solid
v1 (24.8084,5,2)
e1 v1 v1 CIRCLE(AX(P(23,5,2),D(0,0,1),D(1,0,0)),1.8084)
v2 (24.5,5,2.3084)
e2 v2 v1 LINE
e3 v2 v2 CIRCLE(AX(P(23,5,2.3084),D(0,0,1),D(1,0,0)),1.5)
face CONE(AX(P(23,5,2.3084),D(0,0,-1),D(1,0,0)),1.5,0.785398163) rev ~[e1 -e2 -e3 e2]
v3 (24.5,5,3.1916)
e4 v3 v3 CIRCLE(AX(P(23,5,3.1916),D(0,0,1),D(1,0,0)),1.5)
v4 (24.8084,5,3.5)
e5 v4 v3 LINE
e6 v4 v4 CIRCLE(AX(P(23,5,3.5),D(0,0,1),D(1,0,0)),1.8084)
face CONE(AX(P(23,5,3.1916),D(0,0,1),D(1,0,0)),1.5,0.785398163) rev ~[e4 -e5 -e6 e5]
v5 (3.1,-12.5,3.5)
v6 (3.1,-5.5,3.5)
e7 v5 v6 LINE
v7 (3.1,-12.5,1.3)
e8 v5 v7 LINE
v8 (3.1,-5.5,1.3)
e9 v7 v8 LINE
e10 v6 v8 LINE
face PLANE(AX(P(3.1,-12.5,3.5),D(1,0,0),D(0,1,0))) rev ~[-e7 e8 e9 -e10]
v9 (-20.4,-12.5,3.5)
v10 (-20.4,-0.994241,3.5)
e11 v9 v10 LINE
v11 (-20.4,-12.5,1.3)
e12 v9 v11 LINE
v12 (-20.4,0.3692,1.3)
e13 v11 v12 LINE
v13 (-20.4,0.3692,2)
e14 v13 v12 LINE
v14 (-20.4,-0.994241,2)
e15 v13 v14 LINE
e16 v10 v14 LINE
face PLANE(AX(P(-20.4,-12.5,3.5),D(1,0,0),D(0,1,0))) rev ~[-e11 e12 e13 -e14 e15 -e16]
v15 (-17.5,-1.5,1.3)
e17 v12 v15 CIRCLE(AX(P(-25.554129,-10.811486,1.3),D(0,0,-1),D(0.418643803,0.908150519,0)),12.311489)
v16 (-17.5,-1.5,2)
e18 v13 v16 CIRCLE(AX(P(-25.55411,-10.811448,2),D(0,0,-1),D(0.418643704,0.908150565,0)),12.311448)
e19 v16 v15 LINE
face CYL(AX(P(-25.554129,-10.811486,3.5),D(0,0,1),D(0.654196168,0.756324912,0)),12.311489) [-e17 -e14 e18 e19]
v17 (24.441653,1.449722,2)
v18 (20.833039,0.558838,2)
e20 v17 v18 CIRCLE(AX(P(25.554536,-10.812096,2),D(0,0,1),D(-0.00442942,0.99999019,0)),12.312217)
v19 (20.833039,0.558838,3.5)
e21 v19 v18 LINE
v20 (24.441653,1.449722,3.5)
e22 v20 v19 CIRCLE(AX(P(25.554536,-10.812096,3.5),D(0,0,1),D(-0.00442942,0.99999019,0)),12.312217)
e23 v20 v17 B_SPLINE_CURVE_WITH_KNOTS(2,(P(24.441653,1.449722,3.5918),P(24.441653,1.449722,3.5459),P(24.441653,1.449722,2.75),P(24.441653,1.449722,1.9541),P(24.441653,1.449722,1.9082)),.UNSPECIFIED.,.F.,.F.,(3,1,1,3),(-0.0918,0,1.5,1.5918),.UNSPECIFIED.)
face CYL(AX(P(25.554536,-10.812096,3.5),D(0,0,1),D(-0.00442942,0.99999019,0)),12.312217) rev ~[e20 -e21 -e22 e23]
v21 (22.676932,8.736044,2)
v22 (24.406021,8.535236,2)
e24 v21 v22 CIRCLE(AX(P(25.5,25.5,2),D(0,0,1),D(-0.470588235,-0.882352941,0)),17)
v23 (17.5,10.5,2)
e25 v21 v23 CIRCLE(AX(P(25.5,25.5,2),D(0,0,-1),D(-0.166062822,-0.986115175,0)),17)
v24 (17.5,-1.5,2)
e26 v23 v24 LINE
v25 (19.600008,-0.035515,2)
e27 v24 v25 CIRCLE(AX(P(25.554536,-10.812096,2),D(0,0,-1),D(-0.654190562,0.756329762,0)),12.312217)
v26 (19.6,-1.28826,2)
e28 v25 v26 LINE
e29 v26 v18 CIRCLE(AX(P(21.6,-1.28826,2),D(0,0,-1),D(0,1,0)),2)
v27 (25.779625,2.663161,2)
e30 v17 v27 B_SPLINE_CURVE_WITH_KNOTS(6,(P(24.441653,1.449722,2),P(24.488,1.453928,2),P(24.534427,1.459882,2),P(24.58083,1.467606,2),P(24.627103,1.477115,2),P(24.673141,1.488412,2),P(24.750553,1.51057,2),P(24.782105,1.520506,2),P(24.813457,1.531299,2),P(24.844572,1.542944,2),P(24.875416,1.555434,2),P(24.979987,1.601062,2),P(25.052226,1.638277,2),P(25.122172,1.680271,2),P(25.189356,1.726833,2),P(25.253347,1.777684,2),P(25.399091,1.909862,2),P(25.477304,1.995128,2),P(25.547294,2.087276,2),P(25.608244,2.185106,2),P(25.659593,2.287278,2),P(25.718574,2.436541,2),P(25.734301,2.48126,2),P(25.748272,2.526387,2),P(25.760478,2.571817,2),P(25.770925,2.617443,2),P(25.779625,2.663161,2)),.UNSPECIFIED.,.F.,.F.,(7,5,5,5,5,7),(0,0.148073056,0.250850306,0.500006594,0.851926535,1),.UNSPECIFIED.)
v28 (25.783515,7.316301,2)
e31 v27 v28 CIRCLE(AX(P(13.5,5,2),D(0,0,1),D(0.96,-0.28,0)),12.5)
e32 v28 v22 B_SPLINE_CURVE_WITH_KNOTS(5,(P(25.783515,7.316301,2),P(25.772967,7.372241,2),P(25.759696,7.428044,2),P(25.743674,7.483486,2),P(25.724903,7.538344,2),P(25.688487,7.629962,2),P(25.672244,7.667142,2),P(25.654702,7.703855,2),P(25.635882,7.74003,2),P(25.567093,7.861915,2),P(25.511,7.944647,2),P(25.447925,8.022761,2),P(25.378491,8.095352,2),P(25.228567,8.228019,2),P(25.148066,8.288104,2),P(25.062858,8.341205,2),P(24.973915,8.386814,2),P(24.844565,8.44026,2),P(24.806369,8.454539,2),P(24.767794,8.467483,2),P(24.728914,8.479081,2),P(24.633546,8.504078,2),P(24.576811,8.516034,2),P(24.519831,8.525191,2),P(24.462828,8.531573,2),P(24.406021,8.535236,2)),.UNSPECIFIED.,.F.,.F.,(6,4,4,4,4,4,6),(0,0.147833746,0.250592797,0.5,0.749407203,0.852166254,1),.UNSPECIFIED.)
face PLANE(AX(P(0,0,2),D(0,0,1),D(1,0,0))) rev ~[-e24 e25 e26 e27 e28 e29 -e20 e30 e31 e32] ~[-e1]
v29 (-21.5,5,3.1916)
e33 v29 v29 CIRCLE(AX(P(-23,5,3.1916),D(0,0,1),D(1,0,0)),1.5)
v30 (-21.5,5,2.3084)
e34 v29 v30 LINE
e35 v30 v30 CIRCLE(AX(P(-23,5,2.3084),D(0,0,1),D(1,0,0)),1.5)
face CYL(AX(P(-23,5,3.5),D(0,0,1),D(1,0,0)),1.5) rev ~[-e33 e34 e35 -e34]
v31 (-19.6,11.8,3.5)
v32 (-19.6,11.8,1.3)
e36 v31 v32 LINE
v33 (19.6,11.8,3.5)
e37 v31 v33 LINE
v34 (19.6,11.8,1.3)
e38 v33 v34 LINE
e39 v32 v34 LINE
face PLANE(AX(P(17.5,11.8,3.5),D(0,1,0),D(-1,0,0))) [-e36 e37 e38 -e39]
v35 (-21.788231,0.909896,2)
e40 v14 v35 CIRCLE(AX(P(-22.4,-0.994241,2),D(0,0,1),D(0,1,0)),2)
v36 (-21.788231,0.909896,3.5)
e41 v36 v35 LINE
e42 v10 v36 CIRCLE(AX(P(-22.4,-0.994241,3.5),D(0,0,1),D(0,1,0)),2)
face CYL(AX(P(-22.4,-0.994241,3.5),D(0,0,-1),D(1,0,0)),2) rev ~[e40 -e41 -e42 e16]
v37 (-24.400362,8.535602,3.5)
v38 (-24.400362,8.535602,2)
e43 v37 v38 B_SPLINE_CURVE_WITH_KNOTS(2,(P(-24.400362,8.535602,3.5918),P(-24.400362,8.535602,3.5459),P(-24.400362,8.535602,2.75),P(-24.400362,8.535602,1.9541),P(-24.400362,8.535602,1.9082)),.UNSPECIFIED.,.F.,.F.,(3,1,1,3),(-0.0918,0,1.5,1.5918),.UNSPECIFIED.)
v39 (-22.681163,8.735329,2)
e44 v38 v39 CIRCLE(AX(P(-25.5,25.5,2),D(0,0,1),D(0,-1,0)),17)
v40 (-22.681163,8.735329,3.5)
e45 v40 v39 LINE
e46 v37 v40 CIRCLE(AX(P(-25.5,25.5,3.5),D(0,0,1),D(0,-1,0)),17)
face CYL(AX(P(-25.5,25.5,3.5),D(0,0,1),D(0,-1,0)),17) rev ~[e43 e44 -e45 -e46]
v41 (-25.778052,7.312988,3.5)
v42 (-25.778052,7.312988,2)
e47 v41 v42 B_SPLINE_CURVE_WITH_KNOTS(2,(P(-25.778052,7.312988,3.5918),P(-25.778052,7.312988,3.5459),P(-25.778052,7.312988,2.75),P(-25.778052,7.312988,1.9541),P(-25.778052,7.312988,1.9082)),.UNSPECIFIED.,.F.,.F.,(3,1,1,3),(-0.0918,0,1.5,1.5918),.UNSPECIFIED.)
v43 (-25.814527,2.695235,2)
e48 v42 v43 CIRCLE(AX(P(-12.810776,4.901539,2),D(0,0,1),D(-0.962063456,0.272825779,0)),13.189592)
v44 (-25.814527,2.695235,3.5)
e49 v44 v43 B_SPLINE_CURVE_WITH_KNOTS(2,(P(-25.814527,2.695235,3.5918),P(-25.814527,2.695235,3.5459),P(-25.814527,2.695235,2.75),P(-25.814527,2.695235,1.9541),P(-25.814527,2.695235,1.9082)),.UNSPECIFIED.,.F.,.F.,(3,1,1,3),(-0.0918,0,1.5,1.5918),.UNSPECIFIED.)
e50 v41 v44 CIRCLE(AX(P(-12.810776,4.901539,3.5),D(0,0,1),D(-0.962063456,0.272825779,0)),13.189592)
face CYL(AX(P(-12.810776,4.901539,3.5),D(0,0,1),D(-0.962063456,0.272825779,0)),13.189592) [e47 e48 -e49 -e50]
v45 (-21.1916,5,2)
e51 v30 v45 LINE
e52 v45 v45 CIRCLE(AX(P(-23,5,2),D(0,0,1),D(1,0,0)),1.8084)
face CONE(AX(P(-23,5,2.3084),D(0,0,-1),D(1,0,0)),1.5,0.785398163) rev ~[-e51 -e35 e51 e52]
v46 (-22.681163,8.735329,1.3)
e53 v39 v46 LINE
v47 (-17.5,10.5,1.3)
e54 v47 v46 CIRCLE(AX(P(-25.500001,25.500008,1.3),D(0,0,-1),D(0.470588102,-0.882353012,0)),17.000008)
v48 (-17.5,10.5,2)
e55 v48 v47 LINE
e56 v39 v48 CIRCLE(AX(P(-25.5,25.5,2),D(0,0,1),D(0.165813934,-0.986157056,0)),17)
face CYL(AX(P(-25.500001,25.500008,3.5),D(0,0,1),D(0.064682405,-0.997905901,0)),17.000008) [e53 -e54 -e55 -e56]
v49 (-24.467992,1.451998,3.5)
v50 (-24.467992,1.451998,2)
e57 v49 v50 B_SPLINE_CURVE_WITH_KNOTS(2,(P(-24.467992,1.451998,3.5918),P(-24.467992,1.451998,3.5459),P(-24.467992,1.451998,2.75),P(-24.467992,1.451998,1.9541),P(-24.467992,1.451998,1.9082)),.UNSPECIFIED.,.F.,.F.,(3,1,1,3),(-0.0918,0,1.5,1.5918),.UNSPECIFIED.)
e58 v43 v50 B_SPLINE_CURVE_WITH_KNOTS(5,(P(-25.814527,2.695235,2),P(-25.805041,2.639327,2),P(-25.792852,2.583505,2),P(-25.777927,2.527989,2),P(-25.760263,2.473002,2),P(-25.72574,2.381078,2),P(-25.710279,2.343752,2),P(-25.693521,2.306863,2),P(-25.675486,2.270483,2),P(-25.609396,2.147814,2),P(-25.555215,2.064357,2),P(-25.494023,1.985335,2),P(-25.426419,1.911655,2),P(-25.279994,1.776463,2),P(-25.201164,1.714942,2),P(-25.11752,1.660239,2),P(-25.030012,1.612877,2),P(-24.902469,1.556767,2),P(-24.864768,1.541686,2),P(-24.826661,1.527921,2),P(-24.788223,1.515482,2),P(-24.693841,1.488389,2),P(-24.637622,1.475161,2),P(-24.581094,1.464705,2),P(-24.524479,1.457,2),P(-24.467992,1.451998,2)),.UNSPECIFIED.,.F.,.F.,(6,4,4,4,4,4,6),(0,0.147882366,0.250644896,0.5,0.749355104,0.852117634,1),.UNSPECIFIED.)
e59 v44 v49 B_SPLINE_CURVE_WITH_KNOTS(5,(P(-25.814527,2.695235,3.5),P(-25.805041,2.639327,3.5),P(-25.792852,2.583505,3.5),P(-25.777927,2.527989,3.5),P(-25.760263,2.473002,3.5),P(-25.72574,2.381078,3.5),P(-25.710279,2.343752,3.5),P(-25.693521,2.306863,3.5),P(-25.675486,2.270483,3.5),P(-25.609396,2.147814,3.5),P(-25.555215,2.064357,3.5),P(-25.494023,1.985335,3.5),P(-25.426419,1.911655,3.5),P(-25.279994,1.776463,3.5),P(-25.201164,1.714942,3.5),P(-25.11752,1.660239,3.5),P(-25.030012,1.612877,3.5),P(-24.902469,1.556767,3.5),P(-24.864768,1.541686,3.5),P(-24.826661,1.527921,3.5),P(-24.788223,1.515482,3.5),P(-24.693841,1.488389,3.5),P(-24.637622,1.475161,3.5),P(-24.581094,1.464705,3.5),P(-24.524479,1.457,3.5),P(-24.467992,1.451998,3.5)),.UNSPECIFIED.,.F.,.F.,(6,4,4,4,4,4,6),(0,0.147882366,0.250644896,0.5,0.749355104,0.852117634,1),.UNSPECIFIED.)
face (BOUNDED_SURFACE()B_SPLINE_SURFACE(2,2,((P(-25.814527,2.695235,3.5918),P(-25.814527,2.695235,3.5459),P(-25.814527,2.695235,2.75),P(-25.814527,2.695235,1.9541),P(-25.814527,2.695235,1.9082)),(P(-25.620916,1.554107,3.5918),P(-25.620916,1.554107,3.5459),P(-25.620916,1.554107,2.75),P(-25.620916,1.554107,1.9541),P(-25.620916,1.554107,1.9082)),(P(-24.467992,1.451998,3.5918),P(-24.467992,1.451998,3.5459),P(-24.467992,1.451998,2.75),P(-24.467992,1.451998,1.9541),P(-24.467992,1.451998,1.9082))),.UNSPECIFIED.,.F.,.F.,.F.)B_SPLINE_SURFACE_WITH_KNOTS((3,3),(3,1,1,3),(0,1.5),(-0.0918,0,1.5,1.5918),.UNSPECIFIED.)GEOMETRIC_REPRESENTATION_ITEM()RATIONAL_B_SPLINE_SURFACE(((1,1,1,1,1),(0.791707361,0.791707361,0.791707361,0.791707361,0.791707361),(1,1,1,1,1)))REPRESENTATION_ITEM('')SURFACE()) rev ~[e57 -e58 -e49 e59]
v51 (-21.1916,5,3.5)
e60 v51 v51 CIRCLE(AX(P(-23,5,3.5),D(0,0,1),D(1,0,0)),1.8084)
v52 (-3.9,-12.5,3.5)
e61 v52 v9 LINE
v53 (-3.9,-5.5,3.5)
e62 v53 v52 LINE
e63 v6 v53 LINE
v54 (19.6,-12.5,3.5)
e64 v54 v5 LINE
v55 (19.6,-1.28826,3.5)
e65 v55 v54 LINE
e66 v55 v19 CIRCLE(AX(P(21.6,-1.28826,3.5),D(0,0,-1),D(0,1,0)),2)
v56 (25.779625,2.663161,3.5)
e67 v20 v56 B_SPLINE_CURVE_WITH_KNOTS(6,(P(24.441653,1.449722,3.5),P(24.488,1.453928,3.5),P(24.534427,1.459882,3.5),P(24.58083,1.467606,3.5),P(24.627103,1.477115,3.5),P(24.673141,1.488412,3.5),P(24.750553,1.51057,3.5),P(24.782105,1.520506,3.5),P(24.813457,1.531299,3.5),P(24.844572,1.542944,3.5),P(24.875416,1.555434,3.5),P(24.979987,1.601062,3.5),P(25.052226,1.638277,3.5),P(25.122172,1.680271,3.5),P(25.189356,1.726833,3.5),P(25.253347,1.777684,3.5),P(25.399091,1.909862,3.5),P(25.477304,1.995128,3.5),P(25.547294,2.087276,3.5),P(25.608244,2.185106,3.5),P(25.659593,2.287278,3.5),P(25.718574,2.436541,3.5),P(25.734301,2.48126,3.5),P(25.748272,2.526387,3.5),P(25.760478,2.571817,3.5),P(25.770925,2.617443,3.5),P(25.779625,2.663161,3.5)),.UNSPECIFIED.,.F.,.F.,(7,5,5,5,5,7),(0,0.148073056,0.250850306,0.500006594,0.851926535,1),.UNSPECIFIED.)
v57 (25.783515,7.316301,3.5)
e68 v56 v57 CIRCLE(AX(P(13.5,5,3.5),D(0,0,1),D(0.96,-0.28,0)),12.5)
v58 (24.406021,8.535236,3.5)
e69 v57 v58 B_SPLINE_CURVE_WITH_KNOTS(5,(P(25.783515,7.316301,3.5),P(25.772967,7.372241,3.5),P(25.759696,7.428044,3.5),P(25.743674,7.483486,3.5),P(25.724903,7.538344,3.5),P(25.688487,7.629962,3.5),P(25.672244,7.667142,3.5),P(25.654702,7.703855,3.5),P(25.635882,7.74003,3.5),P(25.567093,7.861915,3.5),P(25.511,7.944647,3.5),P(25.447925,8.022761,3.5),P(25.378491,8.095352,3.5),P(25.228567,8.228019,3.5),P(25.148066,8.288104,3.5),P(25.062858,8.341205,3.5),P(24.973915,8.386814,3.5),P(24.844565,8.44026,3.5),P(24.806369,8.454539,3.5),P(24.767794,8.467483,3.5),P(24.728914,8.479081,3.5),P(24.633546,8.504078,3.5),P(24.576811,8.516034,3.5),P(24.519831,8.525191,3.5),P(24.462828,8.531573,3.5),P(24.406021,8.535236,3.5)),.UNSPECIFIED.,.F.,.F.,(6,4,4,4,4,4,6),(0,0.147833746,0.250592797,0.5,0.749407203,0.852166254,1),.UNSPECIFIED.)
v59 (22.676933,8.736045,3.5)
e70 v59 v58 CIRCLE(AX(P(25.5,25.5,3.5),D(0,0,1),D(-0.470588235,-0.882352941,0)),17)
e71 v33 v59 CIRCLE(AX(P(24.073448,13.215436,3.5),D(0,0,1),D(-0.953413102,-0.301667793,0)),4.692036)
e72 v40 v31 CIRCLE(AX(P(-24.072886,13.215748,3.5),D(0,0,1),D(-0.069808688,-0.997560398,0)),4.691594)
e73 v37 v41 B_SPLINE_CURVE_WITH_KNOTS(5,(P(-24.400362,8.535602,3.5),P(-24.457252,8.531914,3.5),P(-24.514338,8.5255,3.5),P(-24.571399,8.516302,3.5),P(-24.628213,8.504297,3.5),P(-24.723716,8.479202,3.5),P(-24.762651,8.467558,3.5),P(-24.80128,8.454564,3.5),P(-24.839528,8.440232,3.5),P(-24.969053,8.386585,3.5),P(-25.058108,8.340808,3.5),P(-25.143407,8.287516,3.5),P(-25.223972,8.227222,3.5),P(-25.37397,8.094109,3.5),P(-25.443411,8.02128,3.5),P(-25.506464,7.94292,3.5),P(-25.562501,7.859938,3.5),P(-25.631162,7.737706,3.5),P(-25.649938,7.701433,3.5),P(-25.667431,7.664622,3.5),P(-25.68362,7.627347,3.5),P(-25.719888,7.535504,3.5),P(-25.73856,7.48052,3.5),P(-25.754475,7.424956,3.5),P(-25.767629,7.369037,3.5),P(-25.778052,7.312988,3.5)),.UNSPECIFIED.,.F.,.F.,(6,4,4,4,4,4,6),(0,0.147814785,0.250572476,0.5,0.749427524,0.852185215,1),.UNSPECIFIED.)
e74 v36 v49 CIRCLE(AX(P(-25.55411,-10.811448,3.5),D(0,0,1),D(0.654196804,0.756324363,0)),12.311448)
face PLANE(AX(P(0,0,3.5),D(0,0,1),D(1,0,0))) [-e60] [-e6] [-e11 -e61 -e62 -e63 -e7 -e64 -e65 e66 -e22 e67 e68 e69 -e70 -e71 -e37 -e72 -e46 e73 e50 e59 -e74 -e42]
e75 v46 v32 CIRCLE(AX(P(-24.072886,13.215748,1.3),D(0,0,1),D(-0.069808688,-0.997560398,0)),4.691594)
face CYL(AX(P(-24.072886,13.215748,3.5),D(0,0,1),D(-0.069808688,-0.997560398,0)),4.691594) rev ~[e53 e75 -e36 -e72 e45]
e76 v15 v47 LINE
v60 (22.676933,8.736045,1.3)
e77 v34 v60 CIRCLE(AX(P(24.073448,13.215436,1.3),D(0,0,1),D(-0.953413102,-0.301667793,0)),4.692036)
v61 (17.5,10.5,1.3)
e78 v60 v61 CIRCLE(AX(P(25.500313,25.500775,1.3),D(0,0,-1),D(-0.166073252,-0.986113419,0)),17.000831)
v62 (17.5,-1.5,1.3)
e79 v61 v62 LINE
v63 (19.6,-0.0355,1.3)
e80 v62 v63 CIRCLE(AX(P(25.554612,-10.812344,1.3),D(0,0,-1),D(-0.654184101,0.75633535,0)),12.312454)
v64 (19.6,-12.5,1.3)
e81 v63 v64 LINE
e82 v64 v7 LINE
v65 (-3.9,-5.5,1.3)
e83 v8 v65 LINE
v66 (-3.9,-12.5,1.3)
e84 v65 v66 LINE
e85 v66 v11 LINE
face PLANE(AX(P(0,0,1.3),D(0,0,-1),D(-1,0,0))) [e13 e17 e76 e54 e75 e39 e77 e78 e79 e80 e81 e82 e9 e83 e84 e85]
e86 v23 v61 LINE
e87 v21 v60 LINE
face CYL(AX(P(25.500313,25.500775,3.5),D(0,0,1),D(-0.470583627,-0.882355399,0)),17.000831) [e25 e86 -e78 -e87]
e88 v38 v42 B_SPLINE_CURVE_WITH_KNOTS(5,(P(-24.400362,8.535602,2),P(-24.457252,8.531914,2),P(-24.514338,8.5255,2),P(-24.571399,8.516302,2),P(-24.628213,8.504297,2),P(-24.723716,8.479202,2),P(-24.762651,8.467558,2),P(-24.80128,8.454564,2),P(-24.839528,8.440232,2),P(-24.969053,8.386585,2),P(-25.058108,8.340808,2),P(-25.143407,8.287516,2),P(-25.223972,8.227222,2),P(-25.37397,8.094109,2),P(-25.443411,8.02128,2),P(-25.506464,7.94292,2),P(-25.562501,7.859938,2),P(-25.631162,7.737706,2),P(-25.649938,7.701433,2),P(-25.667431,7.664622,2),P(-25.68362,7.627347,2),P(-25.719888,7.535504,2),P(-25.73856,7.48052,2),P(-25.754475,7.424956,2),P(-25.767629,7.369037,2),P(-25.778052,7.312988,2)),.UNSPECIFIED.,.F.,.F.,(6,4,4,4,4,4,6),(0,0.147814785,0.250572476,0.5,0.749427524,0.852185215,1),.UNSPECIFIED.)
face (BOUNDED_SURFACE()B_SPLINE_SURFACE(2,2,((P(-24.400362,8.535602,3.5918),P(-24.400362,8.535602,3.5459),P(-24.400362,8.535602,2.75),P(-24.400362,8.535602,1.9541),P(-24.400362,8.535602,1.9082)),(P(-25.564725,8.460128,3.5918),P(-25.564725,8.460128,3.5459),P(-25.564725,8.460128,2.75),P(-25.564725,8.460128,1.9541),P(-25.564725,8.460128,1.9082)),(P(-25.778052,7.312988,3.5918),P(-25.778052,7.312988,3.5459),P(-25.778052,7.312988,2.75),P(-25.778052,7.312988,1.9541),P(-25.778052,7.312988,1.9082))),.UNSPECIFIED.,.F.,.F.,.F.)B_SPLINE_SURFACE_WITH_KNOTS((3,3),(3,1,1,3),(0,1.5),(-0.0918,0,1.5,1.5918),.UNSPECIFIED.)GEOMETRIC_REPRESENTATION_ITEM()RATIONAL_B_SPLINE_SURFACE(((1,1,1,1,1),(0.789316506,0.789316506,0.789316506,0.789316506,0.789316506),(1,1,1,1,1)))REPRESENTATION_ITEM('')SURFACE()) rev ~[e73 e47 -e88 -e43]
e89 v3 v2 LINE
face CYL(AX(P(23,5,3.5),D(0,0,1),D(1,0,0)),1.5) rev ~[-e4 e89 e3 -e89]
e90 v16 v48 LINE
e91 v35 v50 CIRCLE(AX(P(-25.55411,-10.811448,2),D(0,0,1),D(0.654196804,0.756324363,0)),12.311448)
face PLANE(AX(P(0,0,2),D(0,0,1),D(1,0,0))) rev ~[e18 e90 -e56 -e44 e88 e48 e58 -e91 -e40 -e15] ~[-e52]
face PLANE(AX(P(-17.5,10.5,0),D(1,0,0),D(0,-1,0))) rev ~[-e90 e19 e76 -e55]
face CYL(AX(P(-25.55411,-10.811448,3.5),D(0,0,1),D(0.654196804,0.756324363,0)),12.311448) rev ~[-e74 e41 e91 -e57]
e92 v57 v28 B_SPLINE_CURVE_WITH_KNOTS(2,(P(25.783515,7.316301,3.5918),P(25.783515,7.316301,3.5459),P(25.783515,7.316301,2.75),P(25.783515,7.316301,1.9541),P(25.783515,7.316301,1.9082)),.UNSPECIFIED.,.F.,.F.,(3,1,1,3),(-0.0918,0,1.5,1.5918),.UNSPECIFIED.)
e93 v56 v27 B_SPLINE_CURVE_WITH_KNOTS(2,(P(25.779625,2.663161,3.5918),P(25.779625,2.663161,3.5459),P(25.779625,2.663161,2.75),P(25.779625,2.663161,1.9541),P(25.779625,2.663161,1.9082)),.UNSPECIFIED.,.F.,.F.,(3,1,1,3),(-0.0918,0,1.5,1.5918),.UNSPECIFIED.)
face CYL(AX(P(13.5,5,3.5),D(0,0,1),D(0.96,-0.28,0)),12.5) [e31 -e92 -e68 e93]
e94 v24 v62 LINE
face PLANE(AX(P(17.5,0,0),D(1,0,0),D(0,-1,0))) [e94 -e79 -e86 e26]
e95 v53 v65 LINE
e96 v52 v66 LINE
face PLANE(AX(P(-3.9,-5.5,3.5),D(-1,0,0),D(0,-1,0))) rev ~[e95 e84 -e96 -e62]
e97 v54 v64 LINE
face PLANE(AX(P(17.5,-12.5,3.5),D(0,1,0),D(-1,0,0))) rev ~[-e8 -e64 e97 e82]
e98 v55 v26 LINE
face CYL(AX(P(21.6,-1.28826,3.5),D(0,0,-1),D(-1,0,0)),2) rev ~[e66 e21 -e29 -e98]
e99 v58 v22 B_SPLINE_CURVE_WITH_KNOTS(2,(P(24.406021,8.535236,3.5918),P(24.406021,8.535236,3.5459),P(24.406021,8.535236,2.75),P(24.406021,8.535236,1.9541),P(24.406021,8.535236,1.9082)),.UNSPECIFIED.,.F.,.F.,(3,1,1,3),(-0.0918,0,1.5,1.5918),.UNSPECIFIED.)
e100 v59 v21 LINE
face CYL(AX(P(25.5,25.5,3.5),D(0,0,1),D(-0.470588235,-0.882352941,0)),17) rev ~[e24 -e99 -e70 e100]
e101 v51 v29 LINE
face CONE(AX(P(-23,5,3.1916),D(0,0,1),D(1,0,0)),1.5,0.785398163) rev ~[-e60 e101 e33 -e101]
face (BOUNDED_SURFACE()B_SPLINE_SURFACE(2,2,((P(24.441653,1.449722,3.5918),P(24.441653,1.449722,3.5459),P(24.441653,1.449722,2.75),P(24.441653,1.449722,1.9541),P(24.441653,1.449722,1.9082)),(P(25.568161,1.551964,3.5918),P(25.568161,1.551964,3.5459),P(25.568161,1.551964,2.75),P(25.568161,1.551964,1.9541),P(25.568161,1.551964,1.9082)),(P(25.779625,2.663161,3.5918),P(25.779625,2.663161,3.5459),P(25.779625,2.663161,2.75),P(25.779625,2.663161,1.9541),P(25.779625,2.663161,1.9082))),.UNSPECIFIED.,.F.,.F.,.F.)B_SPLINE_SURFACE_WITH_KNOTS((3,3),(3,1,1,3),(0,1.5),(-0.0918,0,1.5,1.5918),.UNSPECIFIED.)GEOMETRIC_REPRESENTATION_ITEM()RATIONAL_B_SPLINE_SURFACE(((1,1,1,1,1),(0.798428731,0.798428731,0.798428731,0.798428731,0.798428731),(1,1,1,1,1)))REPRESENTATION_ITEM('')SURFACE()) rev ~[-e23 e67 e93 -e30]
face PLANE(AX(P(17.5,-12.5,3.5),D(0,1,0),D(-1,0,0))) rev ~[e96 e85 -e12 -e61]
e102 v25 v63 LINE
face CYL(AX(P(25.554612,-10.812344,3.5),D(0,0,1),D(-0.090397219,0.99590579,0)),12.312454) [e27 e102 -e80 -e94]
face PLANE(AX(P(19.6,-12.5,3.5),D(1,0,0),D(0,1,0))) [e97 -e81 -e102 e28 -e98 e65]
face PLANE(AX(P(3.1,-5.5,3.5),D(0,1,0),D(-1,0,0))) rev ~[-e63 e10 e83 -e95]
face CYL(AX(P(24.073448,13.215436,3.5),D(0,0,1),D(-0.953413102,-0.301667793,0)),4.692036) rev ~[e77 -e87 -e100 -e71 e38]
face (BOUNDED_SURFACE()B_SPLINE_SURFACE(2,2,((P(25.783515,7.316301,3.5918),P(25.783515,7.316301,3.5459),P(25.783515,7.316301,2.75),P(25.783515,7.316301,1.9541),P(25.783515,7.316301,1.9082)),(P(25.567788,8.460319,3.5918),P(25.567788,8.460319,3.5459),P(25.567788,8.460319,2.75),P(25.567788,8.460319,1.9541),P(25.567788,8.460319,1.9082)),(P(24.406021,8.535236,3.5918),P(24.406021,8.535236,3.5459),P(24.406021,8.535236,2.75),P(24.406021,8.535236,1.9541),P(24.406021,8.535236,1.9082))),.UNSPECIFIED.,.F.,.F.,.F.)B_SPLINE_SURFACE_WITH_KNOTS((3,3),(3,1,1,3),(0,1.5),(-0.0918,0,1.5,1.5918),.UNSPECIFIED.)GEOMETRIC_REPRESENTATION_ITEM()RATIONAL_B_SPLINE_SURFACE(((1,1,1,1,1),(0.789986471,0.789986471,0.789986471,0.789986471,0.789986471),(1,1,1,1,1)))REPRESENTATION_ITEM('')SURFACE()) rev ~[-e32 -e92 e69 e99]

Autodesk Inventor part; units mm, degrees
ref_plane "YZ Plane" through (0, 0, 0) normal (1, 0, 0) x (0, 1, 0)
ref_plane "XZ Plane" through (0, 0, 0) normal (0, 1, 0) x (-1, 0, 0)
ref_plane "XY Plane" through (0, 0, 0) normal (0, 0, 1) x (1, 0, 0)
sketch "Sketch1" plane through (0, 0, 0) normal (0, 0, 1) x (1, 0, 0)
  line L0 (0, 0) -> (-17.5, 0) construction
  line L1 (-17.5, 0) -> (17.5, 0) construction
  line L2 (17.5, 0) -> (17.5, -10.5)
  line L3 (17.5, -10.5) -> (17.5, 10.5)
  line L4 (17.5, 10.5) -> (-17.5, 10.5)
  line L5 (-17.5, 10.5) -> (-17.5, -10.5)
  line L6 (17.5, -10.5) -> (3.5, -10.5)
  line L7 (3.5, -10.5) -> (3.5, -5.5)
  line L8 (3.5, -5.5) -> (-3.5, -5.5)
  line L9 (-3.5, -5.5) -> (-3.5, -10.5)
  line L10 (-3.5, -10.5) -> (-17.5, -10.5)
  dimension "d4" = 17.5
  dimension "d5" = 35
  dimension "d6" = 10.5
  dimension "d7" = 21
  dimension "d8" = 14
  dimension "d9" = 5
  dimension "d10" = 7
extrude "Extrusion1" add sketch "Sketch1" along normal blind 3.5
sketch "Sketch2" plane through (0, 0, 0) normal (0, 0, -1) x (-1, 0, 0)
  line L0 (-17.5, -10.5) -> (-17.5, 10.5) construction
  line L1 (-17.5, 10.5) -> (-16.5, 10.5) construction
  line L2 (-17.5, 10.5) -> (17.5, 10.5) construction
  line L3 (-16.5, 10.5) -> (-16.5, 9.5) construction
  line L4 (-16.5, 9.5) -> (-17.5, 9.5) construction
  line L5 (-16.5, 9.5) -> (-13.5, 9.5) construction
  line L6 (-15, 9.5) -> (-15, 8) construction
  line L7 (-16.5, 9.5) -> (-16.5, 7.1912) construction
  circle A0 centre (-15, 8) radius 1.5 construction
  circle A1 centre (-15, 8) radius 1.5
  line L8 (-15, 8) -> (-17.5, 8) construction
  line L9 (17.5, 10.5) -> (17.5, -10.5) construction
  line L10 (17.5, 10.5) -> (16.5, 10.5) construction
  line L11 (16.5, 10.5) -> (17.5, 10.5) construction
  line L12 (17.5, 10.5) -> (17.5, 9.5) construction
  line L13 (17.5, 9.5) -> (17.5, 5.455) construction
  line L14 (17.5, 10.5) -> (15, 10.5) construction
  line L15 (15, 10.5) -> (15, 8) construction
  line L16 (15, 8) -> (17.5, 8) construction
  circle A2 centre (15, 8) radius 1.5 construction
  circle A3 centre (15, 8) radius 1.5
  point P0 (0, 0)
  dimension "d13" = 1
  dimension "d14" = 1
  dimension "d15" = 3
  dimension "d16" = 1.5
  dimension "d17" = 3
  dimension "d18" = 1
  dimension "d19" = 1
  dimension "d20" = 2.5
  dimension "d21" = 2.5
  dimension "d22" = 3
extrude "Extrusion2" add sketch "Sketch2" along normal blind 1
sketch "Sketch3" plane through (-17.5, -10.5, 0) normal (-1, 0, 0) x (0, 0, 1)
  line L0 (0, 21) -> (3.5, 21) construction
  line L1 (3.5, 21) -> (2, 21) construction
  line L2 (2, 21) -> (2, 0)
  line L3 (0, 0) -> (3.5, 0) projected
  line L4 (3.5, 0) -> (2, 0)
  line L5 (3.5, 21) -> (3.5, 0) projected
  line L6 (3.5, 0) -> (3.5, 21)
  line L7 (3.5, 21) -> (2, 21)
  point P0 (0, 10.5)
  dimension "d25" = 1.5
sketch "Sketch4" plane through (0, 0, 3.5) normal (0, 0, 1) x (1, 0, 0)
  line L0 (17.5, 10.5) -> (-17.5, 10.5) projected
  line L1 (-17.5, 10.5) -> (-17.5, 8.5)
  line L2 (-17.5, 10.5) -> (-17.5, -10.5) projected
  line L3 (-17.5, 8.5) -> (-25.5, 8.5) construction
  line L4 (-17.5, 10.5) -> (-17.5, 1.5) construction
  line L5 (-17.5, 10.5) -> (-17.5, -1.5) construction
  line L6 (-17.5, -1.5) -> (-17.5, 1.5) construction
  line L7 (-17.5, 1.5) -> (-25.5542, 1.5) construction
  arc A0 (-17.5, -1.5) -> (-25.5542, 1.5) centre (-25.5542, -10.8116) ccw
  arc A1 (-25.5, 8.5) -> (-17.5, 10.5) centre (-25.5, 25.5) ccw
  line L8 (-17.5, 5) -> (-21.5, 5) construction
  line L9 (-21.5, 5) -> (-23, 5) construction
  circle A2 centre (-23, 5) radius 1.5
  line L10 (-24.5, 5) -> (-26, 5) construction
  arc A3 (-25.5, 8.5) -> (-25.5542, 1.5) centre (-12.8112, 4.9016) ccw
  line L11 (17.5, -10.5) -> (17.5, 10.5) projected
  line L12 (17.5, 10.5) -> (17.5, 8.5)
  line L13 (17.5, 10.5) -> (17.5, -1.5)
  line L14 (17.5, 10.5) -> (17.5, 8.5)
  line L15 (17.5, -1.5) -> (17.5, 1.5)
  line L16 (17.5, 8.5) -> (25.5, 8.5) construction
  line L17 (17.5, 1.5) -> (25.5, 1.5) construction
  arc A4 (25.5, 1.5) -> (17.5, -1.5) centre (25.5545, -10.8119) ccw
  arc A5 (17.5, 10.5) -> (25.5, 8.5) centre (25.5, 25.5) ccw
  line L18 (25.5, 8.5) -> (25.5, 5) construction
  line L19 (17.5, 5) -> (21.5, 5) construction
  line L20 (21.5, 5) -> (23, 5) construction
  circle A6 centre (23, 5) radius 1.5
  line L21 (24.5, 5) -> (26, 5) construction
  arc A7 (25.5, 1.5) -> (25.5, 8.5) centre (13.5, 5) ccw
  point P0 (0, 0)
  dimension "d33" = 3
  dimension "d44" = 3
  dimension "d26" = 2
  dimension "d27" = 8
  dimension "d28" = 9
  dimension "d29" = 12
  dimension "d30" = 12.3116
  dimension "d31" = 4
  dimension "d32" = 1.5
  dimension "d34" = 1.5
  dimension "d35" = 12
  dimension "d36" = 2
  dimension "d37" = 3
  dimension "d38" = 8
  dimension "d39" = 12.312
  dimension "d40" = 17
  dimension "d41" = 3.5
  dimension "d42" = 4
  dimension "d43" = 1.5
  dimension "d45" = 1.5
extrude "Extrusion3" add sketch "Sketch4" against normal blind 1.5
fillet "Fillet1" radius 1.5 4 edges at (-25.5, 8.5, 2.75) (-25.5542, 1.5, 2.75) (25.5, 1.5, 2.75) (25.5, 8.5, 2.75)
chamfer "Chamfer1" distance 0.3084 angle 45 1 edges at (21.5, 5, 3.5)
chamfer "Chamfer2" distance 0.3084 angle 45 3 edges at (21.5, 5, 2) (-24.5, 5, 3.5) (-24.5, 5, 2)
thread "Thread1" size "M3x0.5" class "6H" standard "ISO Metric profile" full length
thread "Thread2" size "M3x0.5" class "6H" standard "ISO Metric profile" full length
sketch "Sketch5" plane through (15, 8, -1) normal (0, 0, -1) x (-1, 0, 0)
  circle A0 centre (0, 0) radius 1.5 projected
  circle A1 centre (0, 0) radius 1.5
  circle A2 centre (30, 0) radius 1.5 projected
  circle A3 centre (30, 0) radius 1.5
  point P0 (15, -8)
  dimension "d59" = 3
extrude "Extrusion4" cut sketch "Sketch5" against normal blind 1
sketch "Sketch6" plane through (0, 0, 0) normal (0, 0, -1) x (-1, 0, 0)
  line L0 (-17.5, -10.5) -> (-17.5, 10.5) projected
  line L1 (-17.5, 10.5) -> (17.5, 10.5) projected
  line L2 (-17.5, 10.5) -> (17.5, 10.5)
  line L3 (17.5, 10.5) -> (17.5, -10.5)
  line L4 (-3.5, -10.5) -> (-17.5, -10.5) projected
  line L5 (-17.5, -10.5) -> (-3.5, -10.5)
  line L6 (-3.5, -10.5) -> (-3.5, -5.5)
  line L7 (-3.5, -5.5) -> (3.5, -5.5)
  line L8 (3.5, -5.5) -> (3.5, -10.5)
  line L9 (3.5, -10.5) -> (17.5, -10.5)
  point P0 (0, 0)
  dimension "d62" = 21
  dimension "d63" = 5
  dimension "d64" = 7
extrude "Extrusion5" cut sketch "Sketch6" against normal blind 1.3
sketch "Sketch7" plane through (0, 0, 1.3) normal (0, 0, -1) x (-1, 0, 0)
  line L0 (-3.5, -5.5) -> (-3.5, -10.5) projected
  line L1 (-3.5, -10.5) -> (-3.5, -5.5)
  line L2 (-3.5, -5.5) -> (3.5, -5.5)
  line L3 (3.5, -5.5) -> (3.5, -10.5)
  line L4 (3.5, -10.5) -> (-3.5, -10.5)
  point P0 (0, 0)
  dimension "d67" = 7
extrude "Extrusion6" add sketch "Sketch7" against normal blind 2.2
sketch "Sketch8" plane through (-17.5, 10.5, 3.5) normal (0, 1, 0) x (1, 0, 0)
  point P0 (17.5, 3.5)
sketch "Sketch9" plane through (0, 0, 3.5) normal (0, 0, 1) x (1, 0, 0)
  line L0 (-17.5, 10.5) -> (-17.5, -10.5) projected
  line L1 (-17.5, 10.5) -> (-17.5, 11.8)
  line L2 (17.5, 10.5) -> (-17.5, 10.5) projected
  line L3 (17.5, 10.5) -> (17.5, 11.8)
  line L4 (17.5, 11.8) -> (-17.5, 11.8)
  line L5 (-17.5, 10.5) -> (17.5, 10.5)
  line L6 (17.5, 11.8) -> (20.2, 11.8)
  line L7 (-17.5, 11.8) -> (-19.5, 11.8)
  line L8 (17.5, -10.5) -> (17.5, 10.5) projected
  line L9 (17.5, -1.4787) -> (17.5, 0.3213)
  line L10 (-17.5, -10.5) -> (17.5, -10.5) projected
  line L11 (-17.5, -10.5) -> (17.5, -10.5)
  line L12 (17.5, -10.5) -> (17.5, -12.5)
  line L13 (17.5, -12.5) -> (-17.5, -12.5)
  line L14 (-17.5, -12.5) -> (-17.5, -10.5)
  line L15 (17.5, -12.5) -> (19.6, -12.5)
  line L16 (19.6, -12.5) -> (19.6, -1.4787)
  line L17 (19.6, -1.4787) -> (17.5, -1.4787)
  line L18 (17.5, -1.4787) -> (17.5, -10.5)
  line L19 (-17.5, -12.5) -> (-20.4, -12.5)
  line L20 (-20.4, -12.5) -> (-20.4, -1.4787)
  line L21 (-20.4, -1.4787) -> (-17.5, -1.4787)
  line L22 (-17.5, -1.4787) -> (-17.5, -10.5)
  line L23 (-20.4, -1.4787) -> (-20.4, 0.3692)
  arc A0 (-17.5, -1.5) -> (-24.468, 1.452) centre (-25.5542, -10.8116) ccw projected
  line L24 (19.6, -1.4787) -> (19.6, -0.0355)
  arc A1 (24.4416, 1.4497) -> (17.5, -1.5) centre (25.5545, -10.8119) ccw projected
  arc A2 (19.6, -0.0355) -> (17.5, -1.5) centre (25.5545, -10.8119) ccw
  arc A3 (-17.5, -1.5) -> (-20.4, 0.3692) centre (-25.5542, -10.8116) ccw
  point P0 (0, 0)
  dimension "d70" = 1.3
  dimension "d71" = 2.7
  dimension "d72" = 2
  dimension "d74" = 1.8
  dimension "d76" = 2
  dimension "d77" = 2.1
  dimension "d78" = 2.9
  dimension "d79" = 1.8479
extrude "Extrusion7" add sketch "Sketch9" against normal blind 2.2 contours L1 L4 L3 L2 | L0 L14 L19 L20 L21 A0 | L21 L23 A0 | L10 L12 L13 L14 | L8 A1 L17 L16 L15 L12 | A1 L24 L17
sketch "Sketch10" plane through (0, 0, 3.5) normal (0, 0, 1) x (1, 0, 0)
  line L0 (17.5, 11.8) -> (-17.5, 11.8) projected
  line L1 (-17.5, 11.8) -> (-19.6, 11.8)
  line L2 (-19.6, 11.8) -> (-19.6, 9.5567)
  arc A0 (-24.4004, 8.5356) -> (-17.5, 10.5) centre (-25.5, 25.5) ccw projected
  line L3 (-17.5, 11.8) -> (-17.5, 10.5)
  arc A1 (-19.6, 9.5567) -> (-17.5, 10.5) centre (-25.5, 25.5) ccw
  line L4 (17.5, 11.8) -> (19.6, 11.8)
  line L5 (19.6, 11.8) -> (19.6, 9.5567)
  arc A2 (17.5, 10.5) -> (24.406, 8.5352) centre (25.5, 25.5) ccw projected
  arc A3 (17.5, 10.5) -> (19.6, 9.5567) centre (25.5, 25.5) ccw
  line L6 (17.5, 11.8) -> (17.5, -1.5) projected
  line L7 (17.5, 11.8) -> (17.5, 10.5)
  arc A4 (-24.4004, 8.5356) -> (-25.7781, 7.313) centre (-24.3033, 7.0387) ccw projected
  arc A5 (-24.4004, 8.5356) -> (-19.6, 11.8) centre (-24.0729, 13.2158) ccw
  arc A6 (19.6, 11.8) -> (24.406, 8.5352) centre (24.0734, 13.2154) ccw
  arc A7 (19.6, 9.5567) -> (24.406, 8.5352) centre (25.5, 25.5) ccw
  arc A8 (-24.4004, 8.5356) -> (-19.6, 9.5567) centre (-25.5, 25.5) ccw
  point P0 (0, 0)
  point P1 (22.6771, 8.736)
  point P2 (-22.6812, 8.7353)
  dimension "d82" = 2.1
  dimension "d83" = 2.1
  dimension "d84" = 4.692
extrude "Extrusion8" add sketch "Sketch10" against normal blind 2.2 contours L3 A0 L2 L1 | L2 A0 A5 | L4 L5 A2 L6 | A6 A2 L5
sketch "Sketch11" plane through (0, 0, 3.5) normal (0, 0, 1) x (1, 0, 0)
  point P0 (0, 0)
fillet "Fillet2" radius 2 2 edges at (-20.4, 0.3692, 2.75) (19.6, -0.0355, 2.75)
sketch "Sketch12" plane through (0, 0, 3.5) normal (0, 0, 1) x (1, 0, 0)
  line L0 (19.6, -12.5) -> (-20.4, -12.5) construction
  line L1 (-20.4, -12.5) -> (-3.9, -12.5) construction
  line L2 (-3.9, -12.5) -> (3.1, -12.5)
  line L3 (3.1, -12.5) -> (3.1, -5.5)
  line L4 (3.1, -5.5) -> (-3.9, -5.5)
  line L5 (-3.9, -5.5) -> (-3.9, -12.5)
  point P0 (0, 0)
  dimension "d88" = 16.5
  dimension "d89" = 7
  dimension "d90" = 7
extrude "Extrusion9" cut sketch "Sketch12" against normal blind 2.2
properties part number "casereceiver"
